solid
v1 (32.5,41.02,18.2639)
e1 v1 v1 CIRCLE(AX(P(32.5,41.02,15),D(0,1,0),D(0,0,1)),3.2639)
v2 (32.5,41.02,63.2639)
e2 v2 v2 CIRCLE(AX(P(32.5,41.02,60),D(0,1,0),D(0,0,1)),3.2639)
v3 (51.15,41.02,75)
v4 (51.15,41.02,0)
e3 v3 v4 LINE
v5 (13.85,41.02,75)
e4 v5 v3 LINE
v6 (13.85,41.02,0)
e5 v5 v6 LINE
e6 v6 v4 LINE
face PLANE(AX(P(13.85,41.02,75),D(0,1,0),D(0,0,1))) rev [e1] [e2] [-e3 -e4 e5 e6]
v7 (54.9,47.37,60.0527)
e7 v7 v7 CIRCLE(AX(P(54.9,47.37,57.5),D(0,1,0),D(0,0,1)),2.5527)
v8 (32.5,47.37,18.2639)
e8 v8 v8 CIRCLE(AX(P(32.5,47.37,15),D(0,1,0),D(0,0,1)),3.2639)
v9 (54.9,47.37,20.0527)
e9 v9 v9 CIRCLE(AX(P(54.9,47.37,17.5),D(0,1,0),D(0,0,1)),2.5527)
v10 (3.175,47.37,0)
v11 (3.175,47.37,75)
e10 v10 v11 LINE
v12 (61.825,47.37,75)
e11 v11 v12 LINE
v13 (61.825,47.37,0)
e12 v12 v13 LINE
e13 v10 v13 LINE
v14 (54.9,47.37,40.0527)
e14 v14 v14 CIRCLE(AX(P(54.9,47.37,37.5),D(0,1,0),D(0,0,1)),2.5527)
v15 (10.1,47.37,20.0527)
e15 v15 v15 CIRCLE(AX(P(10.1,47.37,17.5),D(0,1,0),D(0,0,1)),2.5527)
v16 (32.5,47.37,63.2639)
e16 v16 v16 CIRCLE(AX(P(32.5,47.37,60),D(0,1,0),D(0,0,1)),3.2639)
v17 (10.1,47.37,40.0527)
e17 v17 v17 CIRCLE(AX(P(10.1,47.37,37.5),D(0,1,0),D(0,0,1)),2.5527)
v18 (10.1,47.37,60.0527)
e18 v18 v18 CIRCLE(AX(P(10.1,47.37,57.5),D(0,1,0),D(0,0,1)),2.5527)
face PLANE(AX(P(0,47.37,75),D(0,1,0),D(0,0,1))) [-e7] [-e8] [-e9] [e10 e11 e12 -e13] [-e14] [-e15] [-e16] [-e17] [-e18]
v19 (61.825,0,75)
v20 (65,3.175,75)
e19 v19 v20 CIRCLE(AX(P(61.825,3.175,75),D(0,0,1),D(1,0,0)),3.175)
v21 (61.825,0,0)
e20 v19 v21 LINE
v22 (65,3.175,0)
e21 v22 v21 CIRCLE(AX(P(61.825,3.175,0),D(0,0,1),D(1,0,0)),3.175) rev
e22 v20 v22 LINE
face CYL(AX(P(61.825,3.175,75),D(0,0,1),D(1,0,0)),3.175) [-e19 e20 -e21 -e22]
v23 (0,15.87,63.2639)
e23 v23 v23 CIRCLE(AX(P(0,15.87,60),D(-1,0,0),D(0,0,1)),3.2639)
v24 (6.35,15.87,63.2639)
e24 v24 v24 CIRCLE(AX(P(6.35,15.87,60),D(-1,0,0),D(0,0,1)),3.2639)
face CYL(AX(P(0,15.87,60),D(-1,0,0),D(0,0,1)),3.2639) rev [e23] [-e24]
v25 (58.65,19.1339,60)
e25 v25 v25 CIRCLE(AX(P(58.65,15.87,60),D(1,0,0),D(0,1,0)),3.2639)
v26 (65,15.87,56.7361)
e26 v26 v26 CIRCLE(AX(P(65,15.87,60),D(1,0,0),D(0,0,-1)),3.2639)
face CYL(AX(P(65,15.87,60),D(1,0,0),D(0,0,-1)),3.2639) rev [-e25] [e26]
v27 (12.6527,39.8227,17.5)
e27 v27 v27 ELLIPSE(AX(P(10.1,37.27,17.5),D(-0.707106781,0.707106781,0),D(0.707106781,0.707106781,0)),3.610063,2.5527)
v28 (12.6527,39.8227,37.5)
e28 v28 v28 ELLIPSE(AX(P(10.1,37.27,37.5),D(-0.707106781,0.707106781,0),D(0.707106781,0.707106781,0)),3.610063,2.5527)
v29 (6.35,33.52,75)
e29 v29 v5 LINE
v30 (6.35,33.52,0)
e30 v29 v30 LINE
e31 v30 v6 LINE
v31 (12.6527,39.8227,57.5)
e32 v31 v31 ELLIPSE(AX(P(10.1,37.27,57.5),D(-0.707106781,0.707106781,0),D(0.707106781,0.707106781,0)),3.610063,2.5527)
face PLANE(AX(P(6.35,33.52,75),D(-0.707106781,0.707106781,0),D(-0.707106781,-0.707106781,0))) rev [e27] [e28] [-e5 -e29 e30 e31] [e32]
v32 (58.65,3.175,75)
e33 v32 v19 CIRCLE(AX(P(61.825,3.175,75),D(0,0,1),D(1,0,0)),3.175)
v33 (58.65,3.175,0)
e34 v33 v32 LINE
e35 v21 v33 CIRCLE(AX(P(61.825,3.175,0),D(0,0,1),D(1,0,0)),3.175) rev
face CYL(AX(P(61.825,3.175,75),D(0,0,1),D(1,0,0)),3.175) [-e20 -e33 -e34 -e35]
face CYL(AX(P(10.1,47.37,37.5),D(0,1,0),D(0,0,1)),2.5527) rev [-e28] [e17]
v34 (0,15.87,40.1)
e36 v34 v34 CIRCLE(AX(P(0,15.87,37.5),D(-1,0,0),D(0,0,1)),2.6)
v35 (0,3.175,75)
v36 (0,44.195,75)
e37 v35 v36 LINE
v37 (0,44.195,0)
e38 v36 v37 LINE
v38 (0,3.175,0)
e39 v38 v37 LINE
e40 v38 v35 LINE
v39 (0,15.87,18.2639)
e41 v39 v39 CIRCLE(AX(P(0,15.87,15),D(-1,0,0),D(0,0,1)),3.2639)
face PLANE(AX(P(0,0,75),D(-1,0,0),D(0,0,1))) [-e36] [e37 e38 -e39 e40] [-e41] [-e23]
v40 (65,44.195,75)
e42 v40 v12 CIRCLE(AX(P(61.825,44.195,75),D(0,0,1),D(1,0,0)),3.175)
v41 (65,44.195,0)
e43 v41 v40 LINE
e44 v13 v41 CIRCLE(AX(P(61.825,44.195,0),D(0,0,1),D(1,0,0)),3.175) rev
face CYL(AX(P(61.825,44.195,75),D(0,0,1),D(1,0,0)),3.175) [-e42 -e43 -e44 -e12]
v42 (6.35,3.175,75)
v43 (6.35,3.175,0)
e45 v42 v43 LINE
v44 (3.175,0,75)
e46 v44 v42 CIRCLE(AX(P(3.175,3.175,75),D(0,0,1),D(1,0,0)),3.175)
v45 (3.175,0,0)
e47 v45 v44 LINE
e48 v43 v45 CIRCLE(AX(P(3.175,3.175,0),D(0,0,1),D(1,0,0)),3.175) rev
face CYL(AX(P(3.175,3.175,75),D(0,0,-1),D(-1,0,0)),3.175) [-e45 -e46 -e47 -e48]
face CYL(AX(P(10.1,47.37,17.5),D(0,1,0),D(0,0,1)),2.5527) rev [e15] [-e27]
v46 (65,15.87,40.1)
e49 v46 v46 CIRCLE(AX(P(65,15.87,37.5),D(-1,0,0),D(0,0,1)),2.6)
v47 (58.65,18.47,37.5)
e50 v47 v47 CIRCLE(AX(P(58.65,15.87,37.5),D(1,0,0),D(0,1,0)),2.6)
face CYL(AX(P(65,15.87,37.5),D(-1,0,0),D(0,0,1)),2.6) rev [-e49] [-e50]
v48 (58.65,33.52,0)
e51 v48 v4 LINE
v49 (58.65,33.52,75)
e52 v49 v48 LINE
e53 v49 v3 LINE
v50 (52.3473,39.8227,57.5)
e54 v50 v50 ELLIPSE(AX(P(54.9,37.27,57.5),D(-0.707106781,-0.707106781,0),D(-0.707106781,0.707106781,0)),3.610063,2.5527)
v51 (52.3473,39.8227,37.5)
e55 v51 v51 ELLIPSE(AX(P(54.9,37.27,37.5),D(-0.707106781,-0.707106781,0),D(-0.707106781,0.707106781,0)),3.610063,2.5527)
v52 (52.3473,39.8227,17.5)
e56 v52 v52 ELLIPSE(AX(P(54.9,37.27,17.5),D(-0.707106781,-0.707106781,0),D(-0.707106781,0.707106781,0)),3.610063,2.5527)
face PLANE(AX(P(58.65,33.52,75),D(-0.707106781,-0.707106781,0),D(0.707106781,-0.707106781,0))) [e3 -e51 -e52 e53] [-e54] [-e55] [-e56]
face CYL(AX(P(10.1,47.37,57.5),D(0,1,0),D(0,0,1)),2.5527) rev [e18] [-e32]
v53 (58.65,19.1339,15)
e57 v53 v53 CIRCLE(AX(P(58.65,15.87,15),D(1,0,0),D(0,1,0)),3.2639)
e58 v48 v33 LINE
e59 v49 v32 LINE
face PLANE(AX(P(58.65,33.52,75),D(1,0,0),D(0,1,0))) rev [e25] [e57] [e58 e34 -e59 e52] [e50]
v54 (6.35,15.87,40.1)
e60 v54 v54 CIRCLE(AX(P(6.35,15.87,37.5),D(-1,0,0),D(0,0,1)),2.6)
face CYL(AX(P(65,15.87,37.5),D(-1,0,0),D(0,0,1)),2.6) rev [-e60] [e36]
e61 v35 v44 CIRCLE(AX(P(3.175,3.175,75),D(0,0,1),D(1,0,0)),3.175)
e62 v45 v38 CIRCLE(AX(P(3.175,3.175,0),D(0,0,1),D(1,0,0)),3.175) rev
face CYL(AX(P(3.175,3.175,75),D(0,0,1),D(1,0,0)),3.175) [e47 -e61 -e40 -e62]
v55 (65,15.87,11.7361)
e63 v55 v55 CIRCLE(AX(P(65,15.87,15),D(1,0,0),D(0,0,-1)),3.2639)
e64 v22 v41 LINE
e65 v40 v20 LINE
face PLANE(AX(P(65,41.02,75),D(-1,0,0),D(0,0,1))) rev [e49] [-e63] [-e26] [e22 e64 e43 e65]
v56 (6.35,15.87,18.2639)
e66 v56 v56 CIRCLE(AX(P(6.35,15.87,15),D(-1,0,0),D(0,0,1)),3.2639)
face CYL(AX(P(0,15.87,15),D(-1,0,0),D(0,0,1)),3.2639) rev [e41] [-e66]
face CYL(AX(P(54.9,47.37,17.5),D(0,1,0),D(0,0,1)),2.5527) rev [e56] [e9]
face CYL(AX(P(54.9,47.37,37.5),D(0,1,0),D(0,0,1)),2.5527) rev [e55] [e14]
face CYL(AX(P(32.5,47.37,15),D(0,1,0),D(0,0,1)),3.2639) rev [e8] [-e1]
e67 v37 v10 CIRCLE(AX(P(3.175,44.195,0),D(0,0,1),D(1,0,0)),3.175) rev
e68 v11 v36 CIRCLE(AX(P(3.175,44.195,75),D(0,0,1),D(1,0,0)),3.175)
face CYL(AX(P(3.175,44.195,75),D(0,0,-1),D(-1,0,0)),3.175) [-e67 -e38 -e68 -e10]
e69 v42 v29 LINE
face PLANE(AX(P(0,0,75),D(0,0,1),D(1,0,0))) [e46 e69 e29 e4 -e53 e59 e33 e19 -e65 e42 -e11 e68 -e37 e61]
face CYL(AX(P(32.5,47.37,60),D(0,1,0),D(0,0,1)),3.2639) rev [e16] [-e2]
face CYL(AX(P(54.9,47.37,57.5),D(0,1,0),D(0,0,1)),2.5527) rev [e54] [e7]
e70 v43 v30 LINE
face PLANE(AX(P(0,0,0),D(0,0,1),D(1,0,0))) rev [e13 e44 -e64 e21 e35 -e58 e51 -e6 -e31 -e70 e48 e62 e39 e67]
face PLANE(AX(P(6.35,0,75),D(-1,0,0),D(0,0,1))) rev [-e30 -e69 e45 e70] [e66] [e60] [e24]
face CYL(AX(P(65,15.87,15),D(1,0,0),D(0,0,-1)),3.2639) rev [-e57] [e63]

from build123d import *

# Parameters (mm, degrees)
BOSS_EXTRUDE1_DEPTH           = 75
F_5_16_18_TAPPED_HOLE1_REACH  = 111.972
F_5_16_18_TAPPED_HOLE1_BORE_R = 3.2639
F_5_16_18_TAPPED_HOLE2_D      = 6.5278
SKETCH8_R                     = 2.6
CUT_EXTRUDE1_DEPTH            = 110.972346069
F_1_4_20_TAPPED_HOLE1_D       = 5.1054
F_1_4_20_TAPPED_HOLE1_DEPTH   = 13.851
FILLET1_R                     = 3.175


with BuildPart() as part:
    # Sketch1 → Boss-Extrude1 (new body)
    with BuildSketch(Plane.XY):
        Polygon((58.65, 33.52), (51.15, 41.02), (13.85, 41.02), (6.35, 33.52), (6.35, 0), (0, 0), (0, 41.02), (0, 47.37), (65, 47.37), (65, 41.02), (65, 0), (58.65, 0), align=None)
    extrude(amount=BOSS_EXTRUDE1_DEPTH)

    # 5/16-18 Tapped Hole1 bore → 5/16-18 Tapped Hole1 (cut, up to next)
    with BuildSketch(Plane.ZY, mode=Mode.PRIVATE) as f_5_16_18_tapped_hole1_sk1:
        with Locations((60, 15.87)):
            Circle(F_5_16_18_TAPPED_HOLE1_BORE_R)
    f_5_16_18_tapped_hole1_tool1 = extrude(f_5_16_18_tapped_hole1_sk1.sketch, amount=-F_5_16_18_TAPPED_HOLE1_REACH, mode=Mode.PRIVATE) & part.part
    # 5/16-18 Tapped Hole1 bore → 5/16-18 Tapped Hole1 (cut, up to next)
    with BuildSketch(Plane.ZY, mode=Mode.PRIVATE) as f_5_16_18_tapped_hole1_sk2:
        with Locations((15, 15.87)):
            Circle(F_5_16_18_TAPPED_HOLE1_BORE_R)
    f_5_16_18_tapped_hole1_tool2 = extrude(f_5_16_18_tapped_hole1_sk2.sketch, amount=-F_5_16_18_TAPPED_HOLE1_REACH, mode=Mode.PRIVATE) & part.part
    f_5_16_18_tapped_hole1_1 = f_5_16_18_tapped_hole1_tool1.solids().sort_by_distance((0, 15.87, 60))[0]
    add(f_5_16_18_tapped_hole1_1, mode=Mode.SUBTRACT)
    f_5_16_18_tapped_hole1_2 = f_5_16_18_tapped_hole1_tool2.solids().sort_by_distance((0, 15.87, 15))[0]
    add(f_5_16_18_tapped_hole1_2, mode=Mode.SUBTRACT)
    f_5_16_18_tapped_hole1 = f_5_16_18_tapped_hole1_1 + f_5_16_18_tapped_hole1_2  # 5/16-18 Tapped Hole1 as one shape, for the pattern or mirror that repeats it

    # Mirror1: 5/16-18 Tapped Hole1 across plane
    add(f_5_16_18_tapped_hole1.mirror(Plane.ZY.offset(-32.5)), mode=Mode.SUBTRACT)

    # 5/16-18 Tapped Hole2 (through all)
    with Locations(Plane(origin=(0, 47.37, 0), x_dir=(1, 0, 0), z_dir=(0, 1, 0))):
        with Locations((32.5, -15), (32.5, -60)):
            Hole(F_5_16_18_TAPPED_HOLE2_D / 2)

    # Sketch8 → Cut-Extrude1 (cut, through all)
    with BuildSketch(Plane.ZY):
        with Locations((37.5, 15.87)):
            Circle(SKETCH8_R)
    extrude(amount=-CUT_EXTRUDE1_DEPTH, mode=Mode.SUBTRACT)

    # 1/4-20 Tapped Hole1
    with Locations(Plane(origin=(0, 47.37, 0), x_dir=(1, 0, 0), z_dir=(0, 1, 0))):
        with Locations((54.9, -57.5), (54.9, -37.5), (54.9, -17.5)):
            f_1_4_20_tapped_hole1 = Hole(F_1_4_20_TAPPED_HOLE1_D / 2, depth=F_1_4_20_TAPPED_HOLE1_DEPTH)

    # Mirror2: 1/4-20 Tapped Hole1 across plane
    add(f_1_4_20_tapped_hole1.mirror(Plane.ZY.offset(-32.5)), mode=Mode.SUBTRACT)

    # Fillet1
    fillet1_edges = [part.edges().sort_by_distance(p)[0] for p in [
        (58.65, 0, 37.5),
        (65, 0, 37.5),
        (0, 0, 37.5),
        (6.35, 0, 37.5),
        (0, 47.37, 37.5),
        (65, 47.37, 37.5),
    ]]
    fillet(fillet1_edges, radius=FILLET1_R - 0.0001)  # a hair under: the kernel refuses the full size


solid = part.part
